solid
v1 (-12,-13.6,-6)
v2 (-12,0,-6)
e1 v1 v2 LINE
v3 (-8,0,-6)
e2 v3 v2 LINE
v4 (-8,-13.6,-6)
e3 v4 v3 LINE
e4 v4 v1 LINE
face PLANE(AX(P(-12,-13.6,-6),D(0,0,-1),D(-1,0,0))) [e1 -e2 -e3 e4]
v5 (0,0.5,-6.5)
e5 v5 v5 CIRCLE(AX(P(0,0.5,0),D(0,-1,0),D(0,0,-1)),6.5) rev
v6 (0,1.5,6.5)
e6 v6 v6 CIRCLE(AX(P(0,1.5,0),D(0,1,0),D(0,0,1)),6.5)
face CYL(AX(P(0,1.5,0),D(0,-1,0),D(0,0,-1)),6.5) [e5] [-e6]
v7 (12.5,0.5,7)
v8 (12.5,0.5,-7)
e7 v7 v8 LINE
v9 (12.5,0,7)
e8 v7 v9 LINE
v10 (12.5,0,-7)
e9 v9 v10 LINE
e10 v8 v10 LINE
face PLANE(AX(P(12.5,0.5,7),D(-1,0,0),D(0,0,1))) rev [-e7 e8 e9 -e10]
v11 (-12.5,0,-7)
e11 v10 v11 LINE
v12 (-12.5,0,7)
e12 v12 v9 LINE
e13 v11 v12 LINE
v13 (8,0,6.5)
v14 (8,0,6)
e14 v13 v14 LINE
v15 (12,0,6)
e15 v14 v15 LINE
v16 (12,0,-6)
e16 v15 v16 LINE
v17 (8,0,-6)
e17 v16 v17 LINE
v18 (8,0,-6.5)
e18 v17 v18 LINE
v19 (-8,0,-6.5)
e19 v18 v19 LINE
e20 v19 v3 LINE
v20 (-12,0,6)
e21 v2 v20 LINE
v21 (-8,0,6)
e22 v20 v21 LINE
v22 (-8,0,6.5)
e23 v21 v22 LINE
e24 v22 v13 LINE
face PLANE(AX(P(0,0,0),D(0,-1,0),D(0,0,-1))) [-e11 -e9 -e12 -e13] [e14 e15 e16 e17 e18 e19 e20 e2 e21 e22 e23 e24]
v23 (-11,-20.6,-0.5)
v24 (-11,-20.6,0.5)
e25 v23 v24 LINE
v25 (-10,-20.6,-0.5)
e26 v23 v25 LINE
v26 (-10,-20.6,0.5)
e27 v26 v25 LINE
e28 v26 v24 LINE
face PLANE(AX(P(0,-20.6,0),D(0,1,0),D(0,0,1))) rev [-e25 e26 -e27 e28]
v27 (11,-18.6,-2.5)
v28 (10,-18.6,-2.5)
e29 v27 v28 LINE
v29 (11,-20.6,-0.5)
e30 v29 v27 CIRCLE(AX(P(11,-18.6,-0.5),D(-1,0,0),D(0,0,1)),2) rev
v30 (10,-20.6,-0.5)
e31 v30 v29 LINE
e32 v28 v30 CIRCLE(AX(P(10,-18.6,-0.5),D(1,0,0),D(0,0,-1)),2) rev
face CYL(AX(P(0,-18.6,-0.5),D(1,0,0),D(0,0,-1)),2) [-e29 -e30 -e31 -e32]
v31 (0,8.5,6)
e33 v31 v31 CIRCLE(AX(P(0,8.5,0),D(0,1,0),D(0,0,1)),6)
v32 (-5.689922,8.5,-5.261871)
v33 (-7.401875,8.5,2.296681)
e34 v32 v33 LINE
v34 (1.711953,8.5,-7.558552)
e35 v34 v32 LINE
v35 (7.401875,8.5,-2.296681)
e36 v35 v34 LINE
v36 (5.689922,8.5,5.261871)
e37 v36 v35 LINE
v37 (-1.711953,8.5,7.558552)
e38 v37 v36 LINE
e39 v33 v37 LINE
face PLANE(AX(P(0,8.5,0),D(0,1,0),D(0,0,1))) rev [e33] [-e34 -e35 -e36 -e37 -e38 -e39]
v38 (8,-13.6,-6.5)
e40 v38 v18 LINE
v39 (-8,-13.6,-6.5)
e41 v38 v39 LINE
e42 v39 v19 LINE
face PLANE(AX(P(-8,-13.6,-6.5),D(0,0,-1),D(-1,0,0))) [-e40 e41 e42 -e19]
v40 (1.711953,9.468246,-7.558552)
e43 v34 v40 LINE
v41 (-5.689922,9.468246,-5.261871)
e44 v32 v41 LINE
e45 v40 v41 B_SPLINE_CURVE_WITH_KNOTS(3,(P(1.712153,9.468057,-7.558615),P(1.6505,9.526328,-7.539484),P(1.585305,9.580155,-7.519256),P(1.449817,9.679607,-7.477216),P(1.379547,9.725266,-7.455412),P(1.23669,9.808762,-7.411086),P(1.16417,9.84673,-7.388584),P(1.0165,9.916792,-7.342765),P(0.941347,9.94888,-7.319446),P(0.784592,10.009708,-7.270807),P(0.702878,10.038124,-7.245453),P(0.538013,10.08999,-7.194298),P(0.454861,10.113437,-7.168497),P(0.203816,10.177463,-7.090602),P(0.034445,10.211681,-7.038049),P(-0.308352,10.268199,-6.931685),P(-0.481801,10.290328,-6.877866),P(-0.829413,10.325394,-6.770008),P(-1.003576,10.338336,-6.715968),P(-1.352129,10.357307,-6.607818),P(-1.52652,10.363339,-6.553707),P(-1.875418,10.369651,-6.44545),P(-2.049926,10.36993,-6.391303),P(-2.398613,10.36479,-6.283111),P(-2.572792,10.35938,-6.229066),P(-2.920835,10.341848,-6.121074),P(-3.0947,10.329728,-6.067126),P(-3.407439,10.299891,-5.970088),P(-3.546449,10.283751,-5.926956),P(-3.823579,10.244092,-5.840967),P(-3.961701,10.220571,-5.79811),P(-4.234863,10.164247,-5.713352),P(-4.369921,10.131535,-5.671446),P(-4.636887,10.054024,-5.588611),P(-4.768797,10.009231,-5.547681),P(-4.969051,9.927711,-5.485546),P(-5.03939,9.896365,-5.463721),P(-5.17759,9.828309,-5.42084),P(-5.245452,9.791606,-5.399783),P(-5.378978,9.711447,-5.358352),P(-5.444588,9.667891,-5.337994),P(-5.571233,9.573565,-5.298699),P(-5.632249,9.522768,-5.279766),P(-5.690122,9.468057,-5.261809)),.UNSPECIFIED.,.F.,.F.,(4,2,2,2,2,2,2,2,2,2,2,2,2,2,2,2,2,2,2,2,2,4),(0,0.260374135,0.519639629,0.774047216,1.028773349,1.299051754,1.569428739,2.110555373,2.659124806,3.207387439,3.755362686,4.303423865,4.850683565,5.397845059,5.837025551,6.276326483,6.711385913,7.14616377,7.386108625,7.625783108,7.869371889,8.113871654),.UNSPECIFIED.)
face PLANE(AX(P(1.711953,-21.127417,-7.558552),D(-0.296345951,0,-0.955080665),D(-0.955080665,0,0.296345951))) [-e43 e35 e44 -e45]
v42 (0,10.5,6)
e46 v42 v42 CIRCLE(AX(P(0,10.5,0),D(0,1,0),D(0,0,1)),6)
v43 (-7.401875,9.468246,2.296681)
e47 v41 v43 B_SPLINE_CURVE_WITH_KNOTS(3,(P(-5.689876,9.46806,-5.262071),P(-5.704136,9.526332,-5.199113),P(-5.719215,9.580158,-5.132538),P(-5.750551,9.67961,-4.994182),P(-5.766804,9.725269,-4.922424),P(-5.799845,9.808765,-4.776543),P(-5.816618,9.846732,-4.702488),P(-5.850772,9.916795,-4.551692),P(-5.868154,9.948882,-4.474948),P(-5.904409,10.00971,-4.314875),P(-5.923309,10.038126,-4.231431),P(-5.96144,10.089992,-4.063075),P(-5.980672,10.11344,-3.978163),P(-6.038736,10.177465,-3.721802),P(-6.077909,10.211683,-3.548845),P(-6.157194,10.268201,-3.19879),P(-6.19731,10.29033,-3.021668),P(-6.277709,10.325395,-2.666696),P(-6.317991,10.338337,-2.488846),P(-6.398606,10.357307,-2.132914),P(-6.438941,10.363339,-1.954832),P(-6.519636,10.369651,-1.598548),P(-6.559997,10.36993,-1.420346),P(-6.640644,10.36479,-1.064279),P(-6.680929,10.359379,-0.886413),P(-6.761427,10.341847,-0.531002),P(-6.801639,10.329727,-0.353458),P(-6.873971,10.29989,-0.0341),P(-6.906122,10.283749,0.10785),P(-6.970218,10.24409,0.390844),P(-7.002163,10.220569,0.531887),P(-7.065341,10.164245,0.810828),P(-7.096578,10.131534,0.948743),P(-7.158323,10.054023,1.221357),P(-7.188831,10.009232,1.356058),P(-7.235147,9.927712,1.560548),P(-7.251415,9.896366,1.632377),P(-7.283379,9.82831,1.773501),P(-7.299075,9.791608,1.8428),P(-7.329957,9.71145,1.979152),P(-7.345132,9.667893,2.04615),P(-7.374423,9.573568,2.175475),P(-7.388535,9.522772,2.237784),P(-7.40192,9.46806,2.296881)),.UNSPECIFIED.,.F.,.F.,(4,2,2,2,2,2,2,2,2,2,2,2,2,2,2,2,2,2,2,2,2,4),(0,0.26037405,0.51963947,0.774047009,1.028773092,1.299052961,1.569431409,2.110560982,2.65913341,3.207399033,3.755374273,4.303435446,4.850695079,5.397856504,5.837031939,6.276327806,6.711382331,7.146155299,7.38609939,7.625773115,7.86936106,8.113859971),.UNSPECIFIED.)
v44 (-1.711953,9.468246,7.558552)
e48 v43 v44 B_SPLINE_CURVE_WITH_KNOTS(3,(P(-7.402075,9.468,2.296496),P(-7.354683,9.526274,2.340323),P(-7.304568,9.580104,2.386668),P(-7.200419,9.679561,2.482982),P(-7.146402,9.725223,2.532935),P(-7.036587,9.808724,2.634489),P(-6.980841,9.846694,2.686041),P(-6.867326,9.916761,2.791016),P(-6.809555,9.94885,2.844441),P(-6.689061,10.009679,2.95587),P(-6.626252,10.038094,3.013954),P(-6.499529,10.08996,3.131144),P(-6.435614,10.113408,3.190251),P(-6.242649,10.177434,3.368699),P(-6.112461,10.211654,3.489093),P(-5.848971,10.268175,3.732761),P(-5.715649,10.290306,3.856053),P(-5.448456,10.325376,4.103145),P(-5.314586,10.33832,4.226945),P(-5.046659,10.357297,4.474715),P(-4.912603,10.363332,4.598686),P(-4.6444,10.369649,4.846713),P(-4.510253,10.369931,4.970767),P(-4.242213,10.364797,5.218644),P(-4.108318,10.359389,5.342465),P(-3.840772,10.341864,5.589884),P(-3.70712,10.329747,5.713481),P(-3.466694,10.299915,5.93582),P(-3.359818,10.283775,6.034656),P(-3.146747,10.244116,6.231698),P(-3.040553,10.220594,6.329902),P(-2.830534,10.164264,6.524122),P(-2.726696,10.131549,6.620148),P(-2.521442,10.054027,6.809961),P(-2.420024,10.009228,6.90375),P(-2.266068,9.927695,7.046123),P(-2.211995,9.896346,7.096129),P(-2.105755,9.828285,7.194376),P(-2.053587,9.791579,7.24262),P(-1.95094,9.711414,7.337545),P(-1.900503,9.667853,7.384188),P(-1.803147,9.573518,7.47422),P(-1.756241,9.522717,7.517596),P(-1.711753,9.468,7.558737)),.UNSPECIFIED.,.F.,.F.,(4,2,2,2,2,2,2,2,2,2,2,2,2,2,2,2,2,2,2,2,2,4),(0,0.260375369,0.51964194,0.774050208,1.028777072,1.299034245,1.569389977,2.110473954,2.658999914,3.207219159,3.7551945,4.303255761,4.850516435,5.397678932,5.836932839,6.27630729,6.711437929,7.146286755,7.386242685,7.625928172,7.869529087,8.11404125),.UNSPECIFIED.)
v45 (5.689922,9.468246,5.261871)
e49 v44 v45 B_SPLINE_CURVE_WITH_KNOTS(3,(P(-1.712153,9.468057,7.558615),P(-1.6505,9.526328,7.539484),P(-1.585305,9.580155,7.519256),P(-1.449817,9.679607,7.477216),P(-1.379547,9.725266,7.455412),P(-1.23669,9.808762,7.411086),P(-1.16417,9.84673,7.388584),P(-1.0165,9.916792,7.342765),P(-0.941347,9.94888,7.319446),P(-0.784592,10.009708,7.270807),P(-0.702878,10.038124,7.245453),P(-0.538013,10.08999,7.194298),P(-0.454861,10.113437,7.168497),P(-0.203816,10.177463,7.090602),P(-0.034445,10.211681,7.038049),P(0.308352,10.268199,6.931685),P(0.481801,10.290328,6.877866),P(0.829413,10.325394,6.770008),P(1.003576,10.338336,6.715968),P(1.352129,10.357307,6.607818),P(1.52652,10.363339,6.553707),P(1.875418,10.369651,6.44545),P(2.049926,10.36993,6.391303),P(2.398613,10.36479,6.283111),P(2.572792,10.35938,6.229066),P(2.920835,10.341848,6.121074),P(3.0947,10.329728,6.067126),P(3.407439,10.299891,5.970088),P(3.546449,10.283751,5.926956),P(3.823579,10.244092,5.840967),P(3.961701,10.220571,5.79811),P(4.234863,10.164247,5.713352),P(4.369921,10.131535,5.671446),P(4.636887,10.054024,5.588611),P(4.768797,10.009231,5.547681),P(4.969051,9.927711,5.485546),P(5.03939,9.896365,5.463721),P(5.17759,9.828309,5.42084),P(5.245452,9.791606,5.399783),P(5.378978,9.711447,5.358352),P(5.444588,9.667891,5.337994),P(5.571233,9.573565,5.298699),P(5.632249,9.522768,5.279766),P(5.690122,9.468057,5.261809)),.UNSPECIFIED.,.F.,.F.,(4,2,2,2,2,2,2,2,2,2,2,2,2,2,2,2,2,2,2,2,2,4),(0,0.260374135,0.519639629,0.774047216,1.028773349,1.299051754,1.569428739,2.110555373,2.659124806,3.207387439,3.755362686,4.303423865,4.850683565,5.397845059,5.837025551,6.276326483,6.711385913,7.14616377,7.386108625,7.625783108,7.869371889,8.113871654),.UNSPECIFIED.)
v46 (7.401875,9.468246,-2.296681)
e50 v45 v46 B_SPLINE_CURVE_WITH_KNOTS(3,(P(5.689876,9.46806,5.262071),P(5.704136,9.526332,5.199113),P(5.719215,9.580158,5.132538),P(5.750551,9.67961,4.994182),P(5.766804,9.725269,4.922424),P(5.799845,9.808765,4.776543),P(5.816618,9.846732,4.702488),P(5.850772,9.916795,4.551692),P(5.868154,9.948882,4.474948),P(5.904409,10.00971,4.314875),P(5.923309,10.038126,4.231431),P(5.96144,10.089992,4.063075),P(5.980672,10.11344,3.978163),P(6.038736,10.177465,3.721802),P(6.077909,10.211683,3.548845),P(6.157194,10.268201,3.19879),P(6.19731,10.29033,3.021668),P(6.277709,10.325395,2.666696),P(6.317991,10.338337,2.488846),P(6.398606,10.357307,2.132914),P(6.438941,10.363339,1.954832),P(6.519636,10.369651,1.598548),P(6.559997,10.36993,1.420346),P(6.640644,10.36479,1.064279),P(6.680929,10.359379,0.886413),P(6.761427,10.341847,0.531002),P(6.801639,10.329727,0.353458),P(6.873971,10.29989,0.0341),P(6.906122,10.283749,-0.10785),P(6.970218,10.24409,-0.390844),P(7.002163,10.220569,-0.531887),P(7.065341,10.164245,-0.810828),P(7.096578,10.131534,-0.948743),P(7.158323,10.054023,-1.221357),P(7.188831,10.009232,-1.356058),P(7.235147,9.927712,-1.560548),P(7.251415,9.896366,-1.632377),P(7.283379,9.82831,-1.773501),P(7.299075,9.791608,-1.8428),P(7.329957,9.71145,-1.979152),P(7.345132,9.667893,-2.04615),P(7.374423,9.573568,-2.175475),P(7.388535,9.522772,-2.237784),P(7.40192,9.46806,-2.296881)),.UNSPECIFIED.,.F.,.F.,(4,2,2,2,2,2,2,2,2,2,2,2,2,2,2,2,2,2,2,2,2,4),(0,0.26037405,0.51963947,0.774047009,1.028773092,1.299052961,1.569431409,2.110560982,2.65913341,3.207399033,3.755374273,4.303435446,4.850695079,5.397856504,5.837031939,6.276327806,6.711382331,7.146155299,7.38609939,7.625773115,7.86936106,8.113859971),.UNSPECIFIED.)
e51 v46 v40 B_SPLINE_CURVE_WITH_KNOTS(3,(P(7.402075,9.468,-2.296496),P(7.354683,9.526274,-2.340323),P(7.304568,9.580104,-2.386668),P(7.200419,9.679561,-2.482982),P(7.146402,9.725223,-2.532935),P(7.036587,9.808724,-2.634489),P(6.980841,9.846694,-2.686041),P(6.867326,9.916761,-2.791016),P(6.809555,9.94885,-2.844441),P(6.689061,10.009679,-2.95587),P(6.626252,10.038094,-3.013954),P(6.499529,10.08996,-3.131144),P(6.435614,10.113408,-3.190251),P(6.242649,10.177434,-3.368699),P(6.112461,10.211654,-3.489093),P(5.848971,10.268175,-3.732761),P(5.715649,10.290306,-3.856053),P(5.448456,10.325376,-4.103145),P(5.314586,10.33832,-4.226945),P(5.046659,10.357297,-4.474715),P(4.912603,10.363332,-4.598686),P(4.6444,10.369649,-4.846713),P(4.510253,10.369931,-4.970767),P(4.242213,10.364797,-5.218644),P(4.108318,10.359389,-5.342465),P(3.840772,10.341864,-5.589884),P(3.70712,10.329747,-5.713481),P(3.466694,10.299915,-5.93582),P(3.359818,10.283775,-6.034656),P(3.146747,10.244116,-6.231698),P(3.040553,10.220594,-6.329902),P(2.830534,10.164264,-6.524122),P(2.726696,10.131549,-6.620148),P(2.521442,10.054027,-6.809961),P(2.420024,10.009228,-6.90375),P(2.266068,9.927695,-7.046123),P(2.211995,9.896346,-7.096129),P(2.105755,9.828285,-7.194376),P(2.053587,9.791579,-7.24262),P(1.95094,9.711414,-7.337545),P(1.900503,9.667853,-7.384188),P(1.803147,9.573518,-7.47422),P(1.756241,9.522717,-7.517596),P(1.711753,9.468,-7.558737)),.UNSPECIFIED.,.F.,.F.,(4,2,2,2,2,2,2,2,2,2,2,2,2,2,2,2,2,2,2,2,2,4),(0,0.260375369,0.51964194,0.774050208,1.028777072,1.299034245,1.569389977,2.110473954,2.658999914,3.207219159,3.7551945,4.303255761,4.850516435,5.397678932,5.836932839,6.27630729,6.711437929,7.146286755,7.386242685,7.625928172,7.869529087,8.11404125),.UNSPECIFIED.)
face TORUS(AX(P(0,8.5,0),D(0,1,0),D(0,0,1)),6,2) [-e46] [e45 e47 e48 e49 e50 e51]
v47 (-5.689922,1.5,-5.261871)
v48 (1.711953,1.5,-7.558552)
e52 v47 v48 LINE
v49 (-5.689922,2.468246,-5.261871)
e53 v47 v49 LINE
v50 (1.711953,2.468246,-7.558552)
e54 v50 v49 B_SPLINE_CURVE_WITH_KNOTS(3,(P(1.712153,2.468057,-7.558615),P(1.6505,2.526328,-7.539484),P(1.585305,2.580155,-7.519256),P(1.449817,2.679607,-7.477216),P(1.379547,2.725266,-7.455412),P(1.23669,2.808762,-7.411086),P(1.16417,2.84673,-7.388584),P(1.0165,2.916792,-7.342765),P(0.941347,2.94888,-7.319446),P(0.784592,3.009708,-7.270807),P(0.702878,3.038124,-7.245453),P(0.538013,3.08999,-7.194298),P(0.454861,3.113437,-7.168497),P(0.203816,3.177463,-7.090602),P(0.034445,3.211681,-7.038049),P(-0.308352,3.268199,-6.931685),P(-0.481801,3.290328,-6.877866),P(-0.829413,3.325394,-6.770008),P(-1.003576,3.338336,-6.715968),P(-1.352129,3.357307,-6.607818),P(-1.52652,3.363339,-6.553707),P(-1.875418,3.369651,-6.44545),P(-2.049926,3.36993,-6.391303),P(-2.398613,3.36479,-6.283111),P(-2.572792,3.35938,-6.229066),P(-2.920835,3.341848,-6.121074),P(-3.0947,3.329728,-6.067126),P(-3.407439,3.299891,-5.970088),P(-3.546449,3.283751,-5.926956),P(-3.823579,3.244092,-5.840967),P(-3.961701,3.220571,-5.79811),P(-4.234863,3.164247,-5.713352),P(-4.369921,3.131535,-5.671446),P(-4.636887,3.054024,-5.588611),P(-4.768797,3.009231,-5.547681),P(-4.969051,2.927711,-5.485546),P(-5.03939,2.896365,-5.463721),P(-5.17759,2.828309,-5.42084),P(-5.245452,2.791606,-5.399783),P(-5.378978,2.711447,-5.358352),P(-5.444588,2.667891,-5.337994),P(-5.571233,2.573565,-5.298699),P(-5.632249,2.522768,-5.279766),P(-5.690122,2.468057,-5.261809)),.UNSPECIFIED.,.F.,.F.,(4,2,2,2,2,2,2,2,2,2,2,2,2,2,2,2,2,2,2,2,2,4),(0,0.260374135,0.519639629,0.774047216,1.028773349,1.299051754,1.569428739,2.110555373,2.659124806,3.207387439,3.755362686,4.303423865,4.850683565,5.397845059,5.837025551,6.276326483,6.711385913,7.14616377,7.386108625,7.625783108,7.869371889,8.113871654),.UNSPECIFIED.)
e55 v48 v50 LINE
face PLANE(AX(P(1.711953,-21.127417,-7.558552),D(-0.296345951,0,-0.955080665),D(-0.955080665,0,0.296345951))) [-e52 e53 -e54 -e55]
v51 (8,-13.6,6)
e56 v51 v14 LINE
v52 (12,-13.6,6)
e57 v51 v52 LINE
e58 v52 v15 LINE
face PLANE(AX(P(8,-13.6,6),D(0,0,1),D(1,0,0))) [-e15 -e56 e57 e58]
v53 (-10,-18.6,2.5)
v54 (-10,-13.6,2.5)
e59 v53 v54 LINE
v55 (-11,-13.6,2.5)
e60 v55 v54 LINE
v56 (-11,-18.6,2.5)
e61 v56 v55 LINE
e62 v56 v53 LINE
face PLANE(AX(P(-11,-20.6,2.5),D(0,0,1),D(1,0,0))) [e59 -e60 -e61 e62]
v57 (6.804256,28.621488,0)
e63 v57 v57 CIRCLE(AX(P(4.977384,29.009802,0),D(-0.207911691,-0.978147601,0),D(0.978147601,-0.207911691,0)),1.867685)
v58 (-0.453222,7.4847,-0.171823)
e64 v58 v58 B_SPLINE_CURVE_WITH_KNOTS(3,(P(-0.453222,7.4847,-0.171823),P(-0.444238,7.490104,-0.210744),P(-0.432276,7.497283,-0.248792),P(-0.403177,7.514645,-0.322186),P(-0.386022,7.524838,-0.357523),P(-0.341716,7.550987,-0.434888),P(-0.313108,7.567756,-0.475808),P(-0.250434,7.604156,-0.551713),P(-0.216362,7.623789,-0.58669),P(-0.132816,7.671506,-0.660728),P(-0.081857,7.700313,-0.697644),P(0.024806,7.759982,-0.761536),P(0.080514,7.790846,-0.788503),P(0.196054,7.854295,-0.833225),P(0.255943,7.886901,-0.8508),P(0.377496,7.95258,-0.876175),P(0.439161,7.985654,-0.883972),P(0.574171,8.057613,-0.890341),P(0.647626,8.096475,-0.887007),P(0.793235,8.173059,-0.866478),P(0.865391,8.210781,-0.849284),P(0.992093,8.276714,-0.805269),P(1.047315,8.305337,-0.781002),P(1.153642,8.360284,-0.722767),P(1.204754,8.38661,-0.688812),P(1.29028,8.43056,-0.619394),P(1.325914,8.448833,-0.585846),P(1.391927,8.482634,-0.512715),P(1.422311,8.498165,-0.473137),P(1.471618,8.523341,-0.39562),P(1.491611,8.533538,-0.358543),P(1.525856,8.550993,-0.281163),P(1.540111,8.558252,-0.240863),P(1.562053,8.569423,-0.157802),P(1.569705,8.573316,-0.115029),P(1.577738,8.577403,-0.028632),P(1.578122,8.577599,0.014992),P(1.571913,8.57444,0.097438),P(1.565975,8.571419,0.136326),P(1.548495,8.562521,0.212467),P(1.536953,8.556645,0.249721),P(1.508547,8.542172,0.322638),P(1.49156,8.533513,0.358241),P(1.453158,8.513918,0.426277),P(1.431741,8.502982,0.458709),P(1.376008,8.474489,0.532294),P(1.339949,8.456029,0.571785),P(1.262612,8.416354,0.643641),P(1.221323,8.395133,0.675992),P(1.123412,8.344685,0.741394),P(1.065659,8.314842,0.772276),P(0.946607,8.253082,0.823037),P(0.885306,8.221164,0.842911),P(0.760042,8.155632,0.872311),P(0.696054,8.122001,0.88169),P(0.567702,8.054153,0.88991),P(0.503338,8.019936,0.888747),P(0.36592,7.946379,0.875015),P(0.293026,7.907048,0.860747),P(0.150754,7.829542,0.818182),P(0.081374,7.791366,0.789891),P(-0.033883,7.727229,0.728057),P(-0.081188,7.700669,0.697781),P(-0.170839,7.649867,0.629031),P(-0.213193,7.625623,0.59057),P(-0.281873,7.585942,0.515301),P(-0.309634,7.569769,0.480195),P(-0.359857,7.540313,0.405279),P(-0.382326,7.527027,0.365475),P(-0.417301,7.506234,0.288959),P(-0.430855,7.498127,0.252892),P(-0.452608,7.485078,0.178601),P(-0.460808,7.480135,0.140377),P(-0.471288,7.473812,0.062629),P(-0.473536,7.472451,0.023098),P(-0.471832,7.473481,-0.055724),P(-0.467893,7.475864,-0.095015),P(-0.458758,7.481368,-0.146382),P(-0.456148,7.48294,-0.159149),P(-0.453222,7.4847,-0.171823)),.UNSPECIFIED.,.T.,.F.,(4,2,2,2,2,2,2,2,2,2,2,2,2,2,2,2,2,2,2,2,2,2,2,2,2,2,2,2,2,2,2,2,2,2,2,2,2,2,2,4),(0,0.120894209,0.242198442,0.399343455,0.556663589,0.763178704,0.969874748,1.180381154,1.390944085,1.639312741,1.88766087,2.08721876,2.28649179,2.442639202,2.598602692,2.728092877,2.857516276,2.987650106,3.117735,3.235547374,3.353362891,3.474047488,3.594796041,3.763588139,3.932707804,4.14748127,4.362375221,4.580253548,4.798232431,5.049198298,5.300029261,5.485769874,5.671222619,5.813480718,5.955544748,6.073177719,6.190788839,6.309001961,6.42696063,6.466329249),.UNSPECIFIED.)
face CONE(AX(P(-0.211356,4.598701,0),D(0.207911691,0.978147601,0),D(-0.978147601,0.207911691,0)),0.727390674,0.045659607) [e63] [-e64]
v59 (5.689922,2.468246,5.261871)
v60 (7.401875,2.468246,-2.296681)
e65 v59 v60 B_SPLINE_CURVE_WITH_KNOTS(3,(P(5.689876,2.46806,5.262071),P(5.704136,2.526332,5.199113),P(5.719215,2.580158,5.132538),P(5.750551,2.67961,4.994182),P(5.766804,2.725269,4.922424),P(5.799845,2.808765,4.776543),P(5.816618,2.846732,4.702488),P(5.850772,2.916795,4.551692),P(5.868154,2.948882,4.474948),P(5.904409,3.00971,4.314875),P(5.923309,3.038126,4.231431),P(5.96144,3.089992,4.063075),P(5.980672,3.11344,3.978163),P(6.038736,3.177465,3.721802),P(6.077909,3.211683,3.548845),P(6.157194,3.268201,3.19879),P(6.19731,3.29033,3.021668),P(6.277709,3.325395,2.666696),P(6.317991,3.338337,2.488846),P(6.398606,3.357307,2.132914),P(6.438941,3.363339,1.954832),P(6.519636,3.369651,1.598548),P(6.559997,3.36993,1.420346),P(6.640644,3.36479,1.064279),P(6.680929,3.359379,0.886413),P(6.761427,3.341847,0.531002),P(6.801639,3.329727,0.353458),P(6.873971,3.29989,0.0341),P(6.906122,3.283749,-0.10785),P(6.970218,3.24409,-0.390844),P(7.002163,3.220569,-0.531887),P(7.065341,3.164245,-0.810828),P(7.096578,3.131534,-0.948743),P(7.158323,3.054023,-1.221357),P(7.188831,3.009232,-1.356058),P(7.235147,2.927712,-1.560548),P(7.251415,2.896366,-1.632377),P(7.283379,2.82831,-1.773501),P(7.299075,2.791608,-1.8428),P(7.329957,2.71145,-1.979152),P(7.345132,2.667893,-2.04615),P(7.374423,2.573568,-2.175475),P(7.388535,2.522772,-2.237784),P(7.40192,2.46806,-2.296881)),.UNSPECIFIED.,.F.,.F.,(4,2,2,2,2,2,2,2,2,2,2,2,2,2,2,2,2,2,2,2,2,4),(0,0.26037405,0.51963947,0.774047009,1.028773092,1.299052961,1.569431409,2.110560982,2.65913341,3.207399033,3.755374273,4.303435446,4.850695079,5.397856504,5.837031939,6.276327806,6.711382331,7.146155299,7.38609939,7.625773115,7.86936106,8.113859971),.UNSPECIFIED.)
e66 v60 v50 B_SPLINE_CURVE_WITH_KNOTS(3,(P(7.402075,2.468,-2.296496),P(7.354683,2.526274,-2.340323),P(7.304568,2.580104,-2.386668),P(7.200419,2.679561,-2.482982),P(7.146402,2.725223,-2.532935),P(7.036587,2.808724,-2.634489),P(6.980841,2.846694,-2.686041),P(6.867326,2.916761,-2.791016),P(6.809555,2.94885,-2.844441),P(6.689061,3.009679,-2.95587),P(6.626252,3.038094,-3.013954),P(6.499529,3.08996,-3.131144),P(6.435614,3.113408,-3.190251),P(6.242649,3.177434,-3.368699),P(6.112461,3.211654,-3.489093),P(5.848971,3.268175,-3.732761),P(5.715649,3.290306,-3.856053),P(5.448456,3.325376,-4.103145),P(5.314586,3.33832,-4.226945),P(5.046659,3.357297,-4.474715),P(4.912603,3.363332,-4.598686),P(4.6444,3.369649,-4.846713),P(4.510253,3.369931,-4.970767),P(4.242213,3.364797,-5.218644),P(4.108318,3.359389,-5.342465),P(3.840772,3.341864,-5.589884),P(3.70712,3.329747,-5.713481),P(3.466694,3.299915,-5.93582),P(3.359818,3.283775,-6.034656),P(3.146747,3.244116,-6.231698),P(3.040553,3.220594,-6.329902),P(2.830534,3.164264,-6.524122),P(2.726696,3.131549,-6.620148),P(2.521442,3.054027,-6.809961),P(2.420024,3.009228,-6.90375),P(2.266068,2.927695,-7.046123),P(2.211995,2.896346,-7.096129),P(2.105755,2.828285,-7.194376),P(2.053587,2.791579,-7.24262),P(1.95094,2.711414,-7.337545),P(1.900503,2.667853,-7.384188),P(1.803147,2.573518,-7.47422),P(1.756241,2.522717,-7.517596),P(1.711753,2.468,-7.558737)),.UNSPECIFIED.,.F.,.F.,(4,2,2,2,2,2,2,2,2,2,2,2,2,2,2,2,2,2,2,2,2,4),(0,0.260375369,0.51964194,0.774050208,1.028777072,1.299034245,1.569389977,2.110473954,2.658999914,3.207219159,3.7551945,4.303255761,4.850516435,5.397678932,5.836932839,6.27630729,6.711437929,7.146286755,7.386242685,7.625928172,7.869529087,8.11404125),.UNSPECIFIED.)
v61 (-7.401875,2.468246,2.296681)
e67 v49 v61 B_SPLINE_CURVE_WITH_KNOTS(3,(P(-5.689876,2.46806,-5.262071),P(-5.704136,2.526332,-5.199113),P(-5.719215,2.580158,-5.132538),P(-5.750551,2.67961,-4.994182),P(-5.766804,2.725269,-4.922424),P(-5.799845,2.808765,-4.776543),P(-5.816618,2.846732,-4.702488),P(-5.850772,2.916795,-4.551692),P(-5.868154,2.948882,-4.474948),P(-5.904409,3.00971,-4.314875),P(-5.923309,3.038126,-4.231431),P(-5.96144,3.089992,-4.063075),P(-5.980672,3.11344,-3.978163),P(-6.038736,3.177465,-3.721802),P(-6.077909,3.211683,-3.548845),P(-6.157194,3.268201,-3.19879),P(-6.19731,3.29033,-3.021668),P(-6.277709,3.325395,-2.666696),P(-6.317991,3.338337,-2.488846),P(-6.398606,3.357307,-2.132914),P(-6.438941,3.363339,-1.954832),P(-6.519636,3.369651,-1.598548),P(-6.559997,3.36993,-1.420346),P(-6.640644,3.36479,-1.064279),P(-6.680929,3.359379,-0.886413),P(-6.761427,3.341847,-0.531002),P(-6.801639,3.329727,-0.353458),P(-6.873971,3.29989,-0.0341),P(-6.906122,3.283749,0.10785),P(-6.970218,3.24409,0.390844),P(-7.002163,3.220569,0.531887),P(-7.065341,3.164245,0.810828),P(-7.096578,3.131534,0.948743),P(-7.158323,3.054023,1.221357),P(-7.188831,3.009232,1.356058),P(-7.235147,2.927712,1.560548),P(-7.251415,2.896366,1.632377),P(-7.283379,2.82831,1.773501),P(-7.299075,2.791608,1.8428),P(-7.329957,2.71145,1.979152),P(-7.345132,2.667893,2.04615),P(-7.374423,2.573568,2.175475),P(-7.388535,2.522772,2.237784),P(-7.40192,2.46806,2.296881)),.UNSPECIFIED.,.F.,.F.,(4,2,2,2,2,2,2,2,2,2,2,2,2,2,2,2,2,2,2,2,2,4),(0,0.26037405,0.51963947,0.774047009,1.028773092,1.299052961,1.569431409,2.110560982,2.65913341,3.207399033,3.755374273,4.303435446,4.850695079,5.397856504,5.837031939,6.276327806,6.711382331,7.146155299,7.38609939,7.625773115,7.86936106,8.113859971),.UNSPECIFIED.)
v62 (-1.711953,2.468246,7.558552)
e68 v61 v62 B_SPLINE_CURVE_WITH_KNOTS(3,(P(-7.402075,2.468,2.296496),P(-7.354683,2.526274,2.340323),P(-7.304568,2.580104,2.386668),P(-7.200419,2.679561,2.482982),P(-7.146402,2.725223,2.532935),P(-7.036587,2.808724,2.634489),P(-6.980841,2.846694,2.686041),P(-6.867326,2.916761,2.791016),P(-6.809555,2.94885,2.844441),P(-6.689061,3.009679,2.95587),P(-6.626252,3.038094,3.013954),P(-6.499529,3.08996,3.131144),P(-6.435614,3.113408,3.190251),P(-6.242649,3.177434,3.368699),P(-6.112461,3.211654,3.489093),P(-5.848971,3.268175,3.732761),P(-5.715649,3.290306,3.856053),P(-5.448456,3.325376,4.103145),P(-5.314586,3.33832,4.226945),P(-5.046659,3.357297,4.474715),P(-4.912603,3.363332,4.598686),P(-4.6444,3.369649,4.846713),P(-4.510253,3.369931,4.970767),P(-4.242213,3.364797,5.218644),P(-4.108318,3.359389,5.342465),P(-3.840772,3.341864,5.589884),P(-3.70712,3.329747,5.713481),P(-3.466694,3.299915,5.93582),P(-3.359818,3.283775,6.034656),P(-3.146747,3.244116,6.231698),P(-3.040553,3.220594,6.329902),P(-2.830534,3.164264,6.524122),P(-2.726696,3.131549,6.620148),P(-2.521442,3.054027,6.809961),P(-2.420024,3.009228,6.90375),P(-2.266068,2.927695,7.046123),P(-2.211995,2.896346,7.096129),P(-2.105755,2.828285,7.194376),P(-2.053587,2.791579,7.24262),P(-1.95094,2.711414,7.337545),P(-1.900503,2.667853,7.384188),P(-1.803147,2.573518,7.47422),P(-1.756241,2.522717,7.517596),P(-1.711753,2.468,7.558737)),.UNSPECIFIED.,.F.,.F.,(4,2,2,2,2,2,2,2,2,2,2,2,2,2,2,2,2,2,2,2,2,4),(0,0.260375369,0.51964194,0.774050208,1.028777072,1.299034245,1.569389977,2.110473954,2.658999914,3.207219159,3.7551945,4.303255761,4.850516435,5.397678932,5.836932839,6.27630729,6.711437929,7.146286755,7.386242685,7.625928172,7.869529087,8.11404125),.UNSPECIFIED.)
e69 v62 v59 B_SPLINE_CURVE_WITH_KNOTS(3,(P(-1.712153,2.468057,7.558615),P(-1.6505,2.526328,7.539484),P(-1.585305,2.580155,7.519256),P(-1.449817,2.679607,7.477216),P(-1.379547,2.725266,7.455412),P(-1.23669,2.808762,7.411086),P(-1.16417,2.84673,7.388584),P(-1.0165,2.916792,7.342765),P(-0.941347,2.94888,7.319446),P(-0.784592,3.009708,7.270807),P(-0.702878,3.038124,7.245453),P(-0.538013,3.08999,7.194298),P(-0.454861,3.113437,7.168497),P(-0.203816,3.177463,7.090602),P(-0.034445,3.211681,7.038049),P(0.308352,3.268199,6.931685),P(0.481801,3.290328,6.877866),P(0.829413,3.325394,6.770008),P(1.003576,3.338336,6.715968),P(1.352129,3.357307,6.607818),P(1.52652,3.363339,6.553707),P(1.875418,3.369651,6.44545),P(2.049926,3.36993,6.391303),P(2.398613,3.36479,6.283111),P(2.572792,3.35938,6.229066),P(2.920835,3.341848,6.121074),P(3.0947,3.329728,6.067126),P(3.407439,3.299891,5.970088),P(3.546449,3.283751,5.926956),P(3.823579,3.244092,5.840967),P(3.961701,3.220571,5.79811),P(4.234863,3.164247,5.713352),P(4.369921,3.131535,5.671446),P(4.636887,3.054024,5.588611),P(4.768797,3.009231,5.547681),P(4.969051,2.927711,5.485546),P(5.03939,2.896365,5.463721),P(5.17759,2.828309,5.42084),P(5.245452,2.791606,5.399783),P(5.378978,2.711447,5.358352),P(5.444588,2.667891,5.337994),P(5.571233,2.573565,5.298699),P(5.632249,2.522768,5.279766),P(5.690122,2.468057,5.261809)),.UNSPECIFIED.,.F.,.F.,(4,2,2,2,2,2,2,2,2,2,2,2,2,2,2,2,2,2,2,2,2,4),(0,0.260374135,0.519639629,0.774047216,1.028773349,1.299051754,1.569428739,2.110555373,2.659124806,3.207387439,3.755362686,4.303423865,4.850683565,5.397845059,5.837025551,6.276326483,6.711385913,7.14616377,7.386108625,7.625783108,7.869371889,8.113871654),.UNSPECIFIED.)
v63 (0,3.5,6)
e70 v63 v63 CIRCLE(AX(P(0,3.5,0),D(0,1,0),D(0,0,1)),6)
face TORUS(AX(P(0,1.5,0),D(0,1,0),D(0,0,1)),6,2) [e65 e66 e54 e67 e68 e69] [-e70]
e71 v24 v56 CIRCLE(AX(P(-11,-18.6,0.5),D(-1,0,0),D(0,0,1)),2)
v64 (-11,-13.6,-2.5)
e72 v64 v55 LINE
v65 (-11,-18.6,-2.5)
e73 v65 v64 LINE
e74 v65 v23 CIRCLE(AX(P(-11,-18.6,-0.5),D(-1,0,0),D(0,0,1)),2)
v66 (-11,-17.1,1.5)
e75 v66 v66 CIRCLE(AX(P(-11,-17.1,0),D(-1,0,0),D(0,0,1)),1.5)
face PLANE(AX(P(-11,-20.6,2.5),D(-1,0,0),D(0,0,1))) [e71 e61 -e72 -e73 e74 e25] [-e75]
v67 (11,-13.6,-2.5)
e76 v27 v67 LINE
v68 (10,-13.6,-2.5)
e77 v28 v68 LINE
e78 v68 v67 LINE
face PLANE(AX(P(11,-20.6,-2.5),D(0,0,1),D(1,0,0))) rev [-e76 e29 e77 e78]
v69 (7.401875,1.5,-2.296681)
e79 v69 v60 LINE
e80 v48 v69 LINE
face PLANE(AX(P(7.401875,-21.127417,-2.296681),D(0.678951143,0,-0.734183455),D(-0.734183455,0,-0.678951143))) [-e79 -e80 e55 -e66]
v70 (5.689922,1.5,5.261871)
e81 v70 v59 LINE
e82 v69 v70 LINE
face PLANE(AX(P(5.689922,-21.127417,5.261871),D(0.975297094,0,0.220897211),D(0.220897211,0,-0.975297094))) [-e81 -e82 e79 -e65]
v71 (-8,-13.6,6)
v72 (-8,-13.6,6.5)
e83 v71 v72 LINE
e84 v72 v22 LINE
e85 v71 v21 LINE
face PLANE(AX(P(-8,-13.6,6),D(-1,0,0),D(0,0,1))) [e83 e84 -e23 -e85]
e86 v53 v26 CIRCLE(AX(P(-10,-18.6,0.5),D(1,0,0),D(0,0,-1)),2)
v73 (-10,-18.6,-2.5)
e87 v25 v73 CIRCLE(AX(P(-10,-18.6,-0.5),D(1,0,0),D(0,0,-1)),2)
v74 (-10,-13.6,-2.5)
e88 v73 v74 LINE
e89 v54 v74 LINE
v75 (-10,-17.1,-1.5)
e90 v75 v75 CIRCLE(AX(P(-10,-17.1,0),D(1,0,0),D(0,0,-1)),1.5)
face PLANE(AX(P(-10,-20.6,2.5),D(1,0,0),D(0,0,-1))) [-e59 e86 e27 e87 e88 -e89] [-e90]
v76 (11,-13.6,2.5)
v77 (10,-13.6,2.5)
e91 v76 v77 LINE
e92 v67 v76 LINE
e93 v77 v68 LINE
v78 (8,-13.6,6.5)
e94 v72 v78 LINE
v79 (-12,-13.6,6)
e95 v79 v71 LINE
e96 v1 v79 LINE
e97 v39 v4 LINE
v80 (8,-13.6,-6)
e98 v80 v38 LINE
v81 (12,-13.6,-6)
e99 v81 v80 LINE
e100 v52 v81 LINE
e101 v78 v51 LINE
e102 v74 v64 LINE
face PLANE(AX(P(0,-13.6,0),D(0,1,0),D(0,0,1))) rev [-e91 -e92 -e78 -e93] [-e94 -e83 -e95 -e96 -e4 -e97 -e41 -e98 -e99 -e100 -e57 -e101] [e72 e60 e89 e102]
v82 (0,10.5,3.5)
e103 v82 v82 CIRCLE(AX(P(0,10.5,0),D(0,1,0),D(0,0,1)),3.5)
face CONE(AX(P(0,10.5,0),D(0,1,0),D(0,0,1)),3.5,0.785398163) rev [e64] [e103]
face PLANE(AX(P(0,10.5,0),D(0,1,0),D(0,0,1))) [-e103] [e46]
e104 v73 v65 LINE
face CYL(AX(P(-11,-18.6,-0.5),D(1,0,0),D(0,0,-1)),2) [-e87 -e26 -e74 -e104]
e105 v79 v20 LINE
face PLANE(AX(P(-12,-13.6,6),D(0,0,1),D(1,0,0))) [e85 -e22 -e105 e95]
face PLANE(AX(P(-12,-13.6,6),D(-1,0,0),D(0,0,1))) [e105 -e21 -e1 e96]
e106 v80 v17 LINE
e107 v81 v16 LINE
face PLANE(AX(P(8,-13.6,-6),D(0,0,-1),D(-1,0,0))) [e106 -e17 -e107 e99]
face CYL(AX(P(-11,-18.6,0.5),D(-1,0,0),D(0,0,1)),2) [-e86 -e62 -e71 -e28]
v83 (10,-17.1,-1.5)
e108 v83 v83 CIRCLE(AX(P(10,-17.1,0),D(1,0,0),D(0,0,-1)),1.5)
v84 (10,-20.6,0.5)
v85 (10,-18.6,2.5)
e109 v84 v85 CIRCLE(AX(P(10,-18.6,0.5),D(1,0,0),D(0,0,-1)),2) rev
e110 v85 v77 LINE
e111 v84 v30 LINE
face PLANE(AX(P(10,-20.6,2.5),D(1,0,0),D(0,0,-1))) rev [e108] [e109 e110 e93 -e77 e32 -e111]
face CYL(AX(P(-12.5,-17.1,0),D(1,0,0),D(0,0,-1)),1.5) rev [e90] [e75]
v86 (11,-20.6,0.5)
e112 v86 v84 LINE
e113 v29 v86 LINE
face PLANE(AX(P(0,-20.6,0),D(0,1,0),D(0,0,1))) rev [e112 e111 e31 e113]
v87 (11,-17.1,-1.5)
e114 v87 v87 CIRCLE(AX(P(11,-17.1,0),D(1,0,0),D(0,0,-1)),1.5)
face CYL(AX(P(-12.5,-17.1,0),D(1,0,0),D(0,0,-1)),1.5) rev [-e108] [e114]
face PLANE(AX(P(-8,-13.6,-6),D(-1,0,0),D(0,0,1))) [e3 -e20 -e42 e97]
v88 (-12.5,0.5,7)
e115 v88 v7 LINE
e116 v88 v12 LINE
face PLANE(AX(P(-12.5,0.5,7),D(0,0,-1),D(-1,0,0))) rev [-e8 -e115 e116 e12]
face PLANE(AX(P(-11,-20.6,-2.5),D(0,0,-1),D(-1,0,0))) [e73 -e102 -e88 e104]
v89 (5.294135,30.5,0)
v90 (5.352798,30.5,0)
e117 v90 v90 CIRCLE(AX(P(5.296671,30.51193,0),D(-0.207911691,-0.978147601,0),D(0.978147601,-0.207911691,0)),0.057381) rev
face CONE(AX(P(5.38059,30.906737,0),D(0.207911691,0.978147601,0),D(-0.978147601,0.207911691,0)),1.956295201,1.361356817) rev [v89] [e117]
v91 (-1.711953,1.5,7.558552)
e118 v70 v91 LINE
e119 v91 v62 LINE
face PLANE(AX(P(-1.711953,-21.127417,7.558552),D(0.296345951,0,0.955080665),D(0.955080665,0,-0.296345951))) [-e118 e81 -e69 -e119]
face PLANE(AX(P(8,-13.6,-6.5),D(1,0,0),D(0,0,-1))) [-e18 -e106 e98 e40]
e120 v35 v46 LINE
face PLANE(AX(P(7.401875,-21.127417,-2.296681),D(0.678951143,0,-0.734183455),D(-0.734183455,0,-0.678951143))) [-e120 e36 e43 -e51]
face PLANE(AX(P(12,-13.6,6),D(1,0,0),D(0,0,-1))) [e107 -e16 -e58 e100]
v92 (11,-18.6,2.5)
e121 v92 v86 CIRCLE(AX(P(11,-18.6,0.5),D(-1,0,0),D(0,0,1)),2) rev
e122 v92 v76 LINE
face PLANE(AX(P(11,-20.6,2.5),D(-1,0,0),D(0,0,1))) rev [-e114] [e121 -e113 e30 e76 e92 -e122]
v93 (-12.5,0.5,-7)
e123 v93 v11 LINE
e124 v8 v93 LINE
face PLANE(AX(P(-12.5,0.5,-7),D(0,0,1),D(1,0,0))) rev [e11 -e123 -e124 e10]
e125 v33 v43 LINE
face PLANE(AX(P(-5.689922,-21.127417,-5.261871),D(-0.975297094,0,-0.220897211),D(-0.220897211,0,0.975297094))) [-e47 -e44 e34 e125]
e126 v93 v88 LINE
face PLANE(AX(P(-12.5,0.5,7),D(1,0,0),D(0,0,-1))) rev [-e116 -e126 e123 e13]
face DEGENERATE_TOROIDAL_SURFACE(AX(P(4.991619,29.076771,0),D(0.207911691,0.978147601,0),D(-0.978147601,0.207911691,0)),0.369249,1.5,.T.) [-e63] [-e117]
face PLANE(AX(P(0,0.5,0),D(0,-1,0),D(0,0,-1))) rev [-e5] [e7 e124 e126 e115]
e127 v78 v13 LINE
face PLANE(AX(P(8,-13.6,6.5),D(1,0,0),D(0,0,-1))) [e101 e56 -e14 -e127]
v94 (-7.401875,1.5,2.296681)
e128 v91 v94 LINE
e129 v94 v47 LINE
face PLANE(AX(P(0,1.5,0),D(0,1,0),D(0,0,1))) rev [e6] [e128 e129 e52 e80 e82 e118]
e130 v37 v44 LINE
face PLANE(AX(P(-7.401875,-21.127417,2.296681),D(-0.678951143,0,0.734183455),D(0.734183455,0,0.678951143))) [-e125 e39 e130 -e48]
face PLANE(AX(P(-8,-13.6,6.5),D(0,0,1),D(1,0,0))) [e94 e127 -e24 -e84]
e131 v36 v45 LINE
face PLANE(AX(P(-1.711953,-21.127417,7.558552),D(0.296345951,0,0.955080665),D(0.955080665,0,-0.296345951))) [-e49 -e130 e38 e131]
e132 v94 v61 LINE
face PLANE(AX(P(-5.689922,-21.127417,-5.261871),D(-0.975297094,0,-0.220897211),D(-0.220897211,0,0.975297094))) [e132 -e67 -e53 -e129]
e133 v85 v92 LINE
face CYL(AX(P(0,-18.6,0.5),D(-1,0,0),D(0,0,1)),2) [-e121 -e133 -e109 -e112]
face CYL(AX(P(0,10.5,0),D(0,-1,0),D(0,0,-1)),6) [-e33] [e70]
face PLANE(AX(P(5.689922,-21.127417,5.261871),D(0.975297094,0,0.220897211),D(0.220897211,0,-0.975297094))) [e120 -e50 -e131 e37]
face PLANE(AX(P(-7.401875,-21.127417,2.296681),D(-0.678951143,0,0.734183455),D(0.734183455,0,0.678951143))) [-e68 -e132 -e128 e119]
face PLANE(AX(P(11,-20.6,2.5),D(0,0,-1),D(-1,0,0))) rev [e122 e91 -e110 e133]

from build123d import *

# Parameters (mm, degrees)
BOSS_EXTRUDE2_DEPTH    = 13.6
SKETCH3_W              = 25
SKETCH3_H              = 14
BOSS_EXTRUDE3_DEPTH    = 0.5
SKETCH4_R              = 6
BOSS_EXTRUDE4_DEPTH    = 10
SKETCH5_R              = 6.5
BOSS_EXTRUDE5_DEPTH    = 1
SKETCH6_R              = 8
BOSS_EXTRUDE6_DEPTH    = 2
BOSS_EXTRUDE7_START    = 5
SKETCH7_R              = 8
BOSS_EXTRUDE7_DEPTH    = 2
FILLET1_R              = 1.5
FILLET2_R              = 2
CUT_EXTRUDE2_START     = -9
CUT_EXTRUDE2_OUTLINE_R = 8
CUT_EXTRUDE2_DEPTH     = 8.869095969
SKETCH13_W             = 1
SKETCH13_H             = 5
BOSS_EXTRUDE8_DEPTH    = 7
SKETCH14_R             = 1.5
CUT_EXTRUDE3_DEPTH     = 40.357608105
FILLET3_R              = 2


# Read off the part's stored shape, not the designer's step: Cut-Extrude2
with BuildPart() as part:
    # Sketch1 → Boss-Extrude2 (new body)
    with BuildSketch(Plane(origin=(0, 0, 0), x_dir=(1, 0, 0), z_dir=(0, 1, 0))):
        Polygon((-12, 6), (-8, 6), (-8, 6.5), (8, 6.5), (8, 6), (12, 6), (12, -6), (8, -6), (8, -6.5), (-8, -6.5), (-8, -6), (-12, -6), align=None)
    extrude(amount=-BOSS_EXTRUDE2_DEPTH)

    # Sketch3 → Boss-Extrude3 (add)
    with BuildSketch(Plane(origin=(0, 0, 0), x_dir=(1, 0, 0), z_dir=(0, 1, 0))):
        Rectangle(SKETCH3_W, SKETCH3_H)
    extrude(amount=BOSS_EXTRUDE3_DEPTH)

    # Sketch4 → Boss-Extrude4 (add)
    with BuildSketch(Plane(origin=(0, 0.5, 0), x_dir=(1, 0, 0), z_dir=(0, 1, 0))):
        with Locations(Location((0, 0, 0), (0, 0, 270))):
            Circle(SKETCH4_R)
    extrude(amount=BOSS_EXTRUDE4_DEPTH)

    # Sketch5 → Boss-Extrude5 (add)
    with BuildSketch(Plane(origin=(0, 0.5, 0), x_dir=(1, 0, 0), z_dir=(0, 1, 0))):
        with Locations(Location((0, 0, 0), (0, 0, 90))):
            Circle(SKETCH5_R)
    extrude(amount=BOSS_EXTRUDE5_DEPTH)

    # Sketch6 → Boss-Extrude6 (add)
    with BuildSketch(Plane(origin=(0, 1.5, 0), x_dir=(1, 0, 0), z_dir=(0, 1, 0))):
        with Locations(Location((0, 0, 0), (0, 0, 270))):
            Circle(SKETCH6_R)
    extrude(amount=BOSS_EXTRUDE6_DEPTH)

    # Sketch7 → Boss-Extrude7 (add)
    with BuildSketch(Plane(origin=(0, 3.5, 0), x_dir=(1, 0, 0), z_dir=(0, 1, 0)).offset(BOSS_EXTRUDE7_START)):
        with Locations(Location((0, 0, 0), (0, 0, 270))):
            Circle(SKETCH7_R)
    extrude(amount=BOSS_EXTRUDE7_DEPTH)

    # Cut-Extrude1 cone 1 section (through the dimple's axis) → Cut-Extrude1 (revolve, cut)
    with BuildSketch(Plane(origin=(0, 10.5, 0), x_dir=(0, 0, 1), z_dir=(1, 0, 0))):
        Polygon((0, 0), (3.5, 0), (0, 3.5), align=None)
    revolve(axis=Axis((0, 10.5, 0), (0, -1, 0)), mode=Mode.SUBTRACT)

    # Sketch8 → Revolve2 (revolve)
    with BuildSketch(Plane.XY, mode=Mode.PRIVATE) as revolve2_sk:
        Polygon((0, 5.593050937), (5.294135454, 30.5), (7.294135454, 30.5), (0.500139858, 4.447468062), align=None)
    revolve(revolve2_sk.sketch.rotate(Axis((0, 5.593050937, 0), (0.2079116908177598, 0.9781476007338056, 0)), 168.394014695), axis=Axis((0, 5.593050937, 0), (0.2079116908177598, 0.9781476007338056, 0)))

    # Fillet1
    fillet1_edges = [part.edges().sort_by_distance(p)[0] for p in [
        (7.255011561, 30.50831604, 0.393567957),
    ]]
    fillet(fillet1_edges, radius=FILLET1_R)

    # Fillet2
    fillet2_edges = [part.edges().sort_by_distance(p)[0] for p in [
        (0, 3.5, -8),
        (0, 10.5, -8),
    ]]
    fillet(fillet2_edges, radius=FILLET2_R - 0.0001)  # a hair under: the kernel refuses the full size

    # Cut-Extrude2 outline → Cut-Extrude2 (cut)
    with BuildSketch(Plane(origin=(0, 10.5, 0), x_dir=(1, 0, 0), z_dir=(0, 1, 0)).offset(CUT_EXTRUDE2_START)):
        Circle(CUT_EXTRUDE2_OUTLINE_R)
        Polygon((-1.711953383, -7.558552481), (-7.401875156, -2.296681121), (-5.689921773, 5.26187136), (1.711953383, 7.558552481), (7.401875156, 2.296681121), (5.689921773, -5.26187136), align=None, mode=Mode.SUBTRACT)
    extrude(amount=CUT_EXTRUDE2_DEPTH, mode=Mode.SUBTRACT)

    # Sketch13 → Boss-Extrude8 (add)
    with BuildSketch(Plane.XZ.offset(13.6)):
        with Locations((10.5, 0)):
            Rectangle(SKETCH13_W, SKETCH13_H)
    boss_extrude8 = extrude(amount=BOSS_EXTRUDE8_DEPTH)

    # Mirror1: Boss-Extrude8 across plane
    add(boss_extrude8.mirror(Plane(origin=(0, 0, 0), x_dir=(0, 0, 1), z_dir=(1, 0, 0))))

    # Sketch14 → Cut-Extrude3 (cut, through all)
    with BuildSketch(Plane(origin=(11, 0, 0), x_dir=(0, 0, -1), z_dir=(1, 0, 0))):
        with Locations((0, -17.1)):
            Circle(SKETCH14_R)
    extrude(amount=-CUT_EXTRUDE3_DEPTH, mode=Mode.SUBTRACT)

    # Fillet3
    fillet3_edges = [part.edges().sort_by_distance(p)[0] for p in [
        (10.5, -20.6, 2.5),
        (10.5, -20.6, -2.5),
        (-10.5, -20.6, -2.5),
        (-10.5, -20.6, 2.5),
    ]]
    fillet(fillet3_edges, radius=FILLET3_R)


solid = part.part
